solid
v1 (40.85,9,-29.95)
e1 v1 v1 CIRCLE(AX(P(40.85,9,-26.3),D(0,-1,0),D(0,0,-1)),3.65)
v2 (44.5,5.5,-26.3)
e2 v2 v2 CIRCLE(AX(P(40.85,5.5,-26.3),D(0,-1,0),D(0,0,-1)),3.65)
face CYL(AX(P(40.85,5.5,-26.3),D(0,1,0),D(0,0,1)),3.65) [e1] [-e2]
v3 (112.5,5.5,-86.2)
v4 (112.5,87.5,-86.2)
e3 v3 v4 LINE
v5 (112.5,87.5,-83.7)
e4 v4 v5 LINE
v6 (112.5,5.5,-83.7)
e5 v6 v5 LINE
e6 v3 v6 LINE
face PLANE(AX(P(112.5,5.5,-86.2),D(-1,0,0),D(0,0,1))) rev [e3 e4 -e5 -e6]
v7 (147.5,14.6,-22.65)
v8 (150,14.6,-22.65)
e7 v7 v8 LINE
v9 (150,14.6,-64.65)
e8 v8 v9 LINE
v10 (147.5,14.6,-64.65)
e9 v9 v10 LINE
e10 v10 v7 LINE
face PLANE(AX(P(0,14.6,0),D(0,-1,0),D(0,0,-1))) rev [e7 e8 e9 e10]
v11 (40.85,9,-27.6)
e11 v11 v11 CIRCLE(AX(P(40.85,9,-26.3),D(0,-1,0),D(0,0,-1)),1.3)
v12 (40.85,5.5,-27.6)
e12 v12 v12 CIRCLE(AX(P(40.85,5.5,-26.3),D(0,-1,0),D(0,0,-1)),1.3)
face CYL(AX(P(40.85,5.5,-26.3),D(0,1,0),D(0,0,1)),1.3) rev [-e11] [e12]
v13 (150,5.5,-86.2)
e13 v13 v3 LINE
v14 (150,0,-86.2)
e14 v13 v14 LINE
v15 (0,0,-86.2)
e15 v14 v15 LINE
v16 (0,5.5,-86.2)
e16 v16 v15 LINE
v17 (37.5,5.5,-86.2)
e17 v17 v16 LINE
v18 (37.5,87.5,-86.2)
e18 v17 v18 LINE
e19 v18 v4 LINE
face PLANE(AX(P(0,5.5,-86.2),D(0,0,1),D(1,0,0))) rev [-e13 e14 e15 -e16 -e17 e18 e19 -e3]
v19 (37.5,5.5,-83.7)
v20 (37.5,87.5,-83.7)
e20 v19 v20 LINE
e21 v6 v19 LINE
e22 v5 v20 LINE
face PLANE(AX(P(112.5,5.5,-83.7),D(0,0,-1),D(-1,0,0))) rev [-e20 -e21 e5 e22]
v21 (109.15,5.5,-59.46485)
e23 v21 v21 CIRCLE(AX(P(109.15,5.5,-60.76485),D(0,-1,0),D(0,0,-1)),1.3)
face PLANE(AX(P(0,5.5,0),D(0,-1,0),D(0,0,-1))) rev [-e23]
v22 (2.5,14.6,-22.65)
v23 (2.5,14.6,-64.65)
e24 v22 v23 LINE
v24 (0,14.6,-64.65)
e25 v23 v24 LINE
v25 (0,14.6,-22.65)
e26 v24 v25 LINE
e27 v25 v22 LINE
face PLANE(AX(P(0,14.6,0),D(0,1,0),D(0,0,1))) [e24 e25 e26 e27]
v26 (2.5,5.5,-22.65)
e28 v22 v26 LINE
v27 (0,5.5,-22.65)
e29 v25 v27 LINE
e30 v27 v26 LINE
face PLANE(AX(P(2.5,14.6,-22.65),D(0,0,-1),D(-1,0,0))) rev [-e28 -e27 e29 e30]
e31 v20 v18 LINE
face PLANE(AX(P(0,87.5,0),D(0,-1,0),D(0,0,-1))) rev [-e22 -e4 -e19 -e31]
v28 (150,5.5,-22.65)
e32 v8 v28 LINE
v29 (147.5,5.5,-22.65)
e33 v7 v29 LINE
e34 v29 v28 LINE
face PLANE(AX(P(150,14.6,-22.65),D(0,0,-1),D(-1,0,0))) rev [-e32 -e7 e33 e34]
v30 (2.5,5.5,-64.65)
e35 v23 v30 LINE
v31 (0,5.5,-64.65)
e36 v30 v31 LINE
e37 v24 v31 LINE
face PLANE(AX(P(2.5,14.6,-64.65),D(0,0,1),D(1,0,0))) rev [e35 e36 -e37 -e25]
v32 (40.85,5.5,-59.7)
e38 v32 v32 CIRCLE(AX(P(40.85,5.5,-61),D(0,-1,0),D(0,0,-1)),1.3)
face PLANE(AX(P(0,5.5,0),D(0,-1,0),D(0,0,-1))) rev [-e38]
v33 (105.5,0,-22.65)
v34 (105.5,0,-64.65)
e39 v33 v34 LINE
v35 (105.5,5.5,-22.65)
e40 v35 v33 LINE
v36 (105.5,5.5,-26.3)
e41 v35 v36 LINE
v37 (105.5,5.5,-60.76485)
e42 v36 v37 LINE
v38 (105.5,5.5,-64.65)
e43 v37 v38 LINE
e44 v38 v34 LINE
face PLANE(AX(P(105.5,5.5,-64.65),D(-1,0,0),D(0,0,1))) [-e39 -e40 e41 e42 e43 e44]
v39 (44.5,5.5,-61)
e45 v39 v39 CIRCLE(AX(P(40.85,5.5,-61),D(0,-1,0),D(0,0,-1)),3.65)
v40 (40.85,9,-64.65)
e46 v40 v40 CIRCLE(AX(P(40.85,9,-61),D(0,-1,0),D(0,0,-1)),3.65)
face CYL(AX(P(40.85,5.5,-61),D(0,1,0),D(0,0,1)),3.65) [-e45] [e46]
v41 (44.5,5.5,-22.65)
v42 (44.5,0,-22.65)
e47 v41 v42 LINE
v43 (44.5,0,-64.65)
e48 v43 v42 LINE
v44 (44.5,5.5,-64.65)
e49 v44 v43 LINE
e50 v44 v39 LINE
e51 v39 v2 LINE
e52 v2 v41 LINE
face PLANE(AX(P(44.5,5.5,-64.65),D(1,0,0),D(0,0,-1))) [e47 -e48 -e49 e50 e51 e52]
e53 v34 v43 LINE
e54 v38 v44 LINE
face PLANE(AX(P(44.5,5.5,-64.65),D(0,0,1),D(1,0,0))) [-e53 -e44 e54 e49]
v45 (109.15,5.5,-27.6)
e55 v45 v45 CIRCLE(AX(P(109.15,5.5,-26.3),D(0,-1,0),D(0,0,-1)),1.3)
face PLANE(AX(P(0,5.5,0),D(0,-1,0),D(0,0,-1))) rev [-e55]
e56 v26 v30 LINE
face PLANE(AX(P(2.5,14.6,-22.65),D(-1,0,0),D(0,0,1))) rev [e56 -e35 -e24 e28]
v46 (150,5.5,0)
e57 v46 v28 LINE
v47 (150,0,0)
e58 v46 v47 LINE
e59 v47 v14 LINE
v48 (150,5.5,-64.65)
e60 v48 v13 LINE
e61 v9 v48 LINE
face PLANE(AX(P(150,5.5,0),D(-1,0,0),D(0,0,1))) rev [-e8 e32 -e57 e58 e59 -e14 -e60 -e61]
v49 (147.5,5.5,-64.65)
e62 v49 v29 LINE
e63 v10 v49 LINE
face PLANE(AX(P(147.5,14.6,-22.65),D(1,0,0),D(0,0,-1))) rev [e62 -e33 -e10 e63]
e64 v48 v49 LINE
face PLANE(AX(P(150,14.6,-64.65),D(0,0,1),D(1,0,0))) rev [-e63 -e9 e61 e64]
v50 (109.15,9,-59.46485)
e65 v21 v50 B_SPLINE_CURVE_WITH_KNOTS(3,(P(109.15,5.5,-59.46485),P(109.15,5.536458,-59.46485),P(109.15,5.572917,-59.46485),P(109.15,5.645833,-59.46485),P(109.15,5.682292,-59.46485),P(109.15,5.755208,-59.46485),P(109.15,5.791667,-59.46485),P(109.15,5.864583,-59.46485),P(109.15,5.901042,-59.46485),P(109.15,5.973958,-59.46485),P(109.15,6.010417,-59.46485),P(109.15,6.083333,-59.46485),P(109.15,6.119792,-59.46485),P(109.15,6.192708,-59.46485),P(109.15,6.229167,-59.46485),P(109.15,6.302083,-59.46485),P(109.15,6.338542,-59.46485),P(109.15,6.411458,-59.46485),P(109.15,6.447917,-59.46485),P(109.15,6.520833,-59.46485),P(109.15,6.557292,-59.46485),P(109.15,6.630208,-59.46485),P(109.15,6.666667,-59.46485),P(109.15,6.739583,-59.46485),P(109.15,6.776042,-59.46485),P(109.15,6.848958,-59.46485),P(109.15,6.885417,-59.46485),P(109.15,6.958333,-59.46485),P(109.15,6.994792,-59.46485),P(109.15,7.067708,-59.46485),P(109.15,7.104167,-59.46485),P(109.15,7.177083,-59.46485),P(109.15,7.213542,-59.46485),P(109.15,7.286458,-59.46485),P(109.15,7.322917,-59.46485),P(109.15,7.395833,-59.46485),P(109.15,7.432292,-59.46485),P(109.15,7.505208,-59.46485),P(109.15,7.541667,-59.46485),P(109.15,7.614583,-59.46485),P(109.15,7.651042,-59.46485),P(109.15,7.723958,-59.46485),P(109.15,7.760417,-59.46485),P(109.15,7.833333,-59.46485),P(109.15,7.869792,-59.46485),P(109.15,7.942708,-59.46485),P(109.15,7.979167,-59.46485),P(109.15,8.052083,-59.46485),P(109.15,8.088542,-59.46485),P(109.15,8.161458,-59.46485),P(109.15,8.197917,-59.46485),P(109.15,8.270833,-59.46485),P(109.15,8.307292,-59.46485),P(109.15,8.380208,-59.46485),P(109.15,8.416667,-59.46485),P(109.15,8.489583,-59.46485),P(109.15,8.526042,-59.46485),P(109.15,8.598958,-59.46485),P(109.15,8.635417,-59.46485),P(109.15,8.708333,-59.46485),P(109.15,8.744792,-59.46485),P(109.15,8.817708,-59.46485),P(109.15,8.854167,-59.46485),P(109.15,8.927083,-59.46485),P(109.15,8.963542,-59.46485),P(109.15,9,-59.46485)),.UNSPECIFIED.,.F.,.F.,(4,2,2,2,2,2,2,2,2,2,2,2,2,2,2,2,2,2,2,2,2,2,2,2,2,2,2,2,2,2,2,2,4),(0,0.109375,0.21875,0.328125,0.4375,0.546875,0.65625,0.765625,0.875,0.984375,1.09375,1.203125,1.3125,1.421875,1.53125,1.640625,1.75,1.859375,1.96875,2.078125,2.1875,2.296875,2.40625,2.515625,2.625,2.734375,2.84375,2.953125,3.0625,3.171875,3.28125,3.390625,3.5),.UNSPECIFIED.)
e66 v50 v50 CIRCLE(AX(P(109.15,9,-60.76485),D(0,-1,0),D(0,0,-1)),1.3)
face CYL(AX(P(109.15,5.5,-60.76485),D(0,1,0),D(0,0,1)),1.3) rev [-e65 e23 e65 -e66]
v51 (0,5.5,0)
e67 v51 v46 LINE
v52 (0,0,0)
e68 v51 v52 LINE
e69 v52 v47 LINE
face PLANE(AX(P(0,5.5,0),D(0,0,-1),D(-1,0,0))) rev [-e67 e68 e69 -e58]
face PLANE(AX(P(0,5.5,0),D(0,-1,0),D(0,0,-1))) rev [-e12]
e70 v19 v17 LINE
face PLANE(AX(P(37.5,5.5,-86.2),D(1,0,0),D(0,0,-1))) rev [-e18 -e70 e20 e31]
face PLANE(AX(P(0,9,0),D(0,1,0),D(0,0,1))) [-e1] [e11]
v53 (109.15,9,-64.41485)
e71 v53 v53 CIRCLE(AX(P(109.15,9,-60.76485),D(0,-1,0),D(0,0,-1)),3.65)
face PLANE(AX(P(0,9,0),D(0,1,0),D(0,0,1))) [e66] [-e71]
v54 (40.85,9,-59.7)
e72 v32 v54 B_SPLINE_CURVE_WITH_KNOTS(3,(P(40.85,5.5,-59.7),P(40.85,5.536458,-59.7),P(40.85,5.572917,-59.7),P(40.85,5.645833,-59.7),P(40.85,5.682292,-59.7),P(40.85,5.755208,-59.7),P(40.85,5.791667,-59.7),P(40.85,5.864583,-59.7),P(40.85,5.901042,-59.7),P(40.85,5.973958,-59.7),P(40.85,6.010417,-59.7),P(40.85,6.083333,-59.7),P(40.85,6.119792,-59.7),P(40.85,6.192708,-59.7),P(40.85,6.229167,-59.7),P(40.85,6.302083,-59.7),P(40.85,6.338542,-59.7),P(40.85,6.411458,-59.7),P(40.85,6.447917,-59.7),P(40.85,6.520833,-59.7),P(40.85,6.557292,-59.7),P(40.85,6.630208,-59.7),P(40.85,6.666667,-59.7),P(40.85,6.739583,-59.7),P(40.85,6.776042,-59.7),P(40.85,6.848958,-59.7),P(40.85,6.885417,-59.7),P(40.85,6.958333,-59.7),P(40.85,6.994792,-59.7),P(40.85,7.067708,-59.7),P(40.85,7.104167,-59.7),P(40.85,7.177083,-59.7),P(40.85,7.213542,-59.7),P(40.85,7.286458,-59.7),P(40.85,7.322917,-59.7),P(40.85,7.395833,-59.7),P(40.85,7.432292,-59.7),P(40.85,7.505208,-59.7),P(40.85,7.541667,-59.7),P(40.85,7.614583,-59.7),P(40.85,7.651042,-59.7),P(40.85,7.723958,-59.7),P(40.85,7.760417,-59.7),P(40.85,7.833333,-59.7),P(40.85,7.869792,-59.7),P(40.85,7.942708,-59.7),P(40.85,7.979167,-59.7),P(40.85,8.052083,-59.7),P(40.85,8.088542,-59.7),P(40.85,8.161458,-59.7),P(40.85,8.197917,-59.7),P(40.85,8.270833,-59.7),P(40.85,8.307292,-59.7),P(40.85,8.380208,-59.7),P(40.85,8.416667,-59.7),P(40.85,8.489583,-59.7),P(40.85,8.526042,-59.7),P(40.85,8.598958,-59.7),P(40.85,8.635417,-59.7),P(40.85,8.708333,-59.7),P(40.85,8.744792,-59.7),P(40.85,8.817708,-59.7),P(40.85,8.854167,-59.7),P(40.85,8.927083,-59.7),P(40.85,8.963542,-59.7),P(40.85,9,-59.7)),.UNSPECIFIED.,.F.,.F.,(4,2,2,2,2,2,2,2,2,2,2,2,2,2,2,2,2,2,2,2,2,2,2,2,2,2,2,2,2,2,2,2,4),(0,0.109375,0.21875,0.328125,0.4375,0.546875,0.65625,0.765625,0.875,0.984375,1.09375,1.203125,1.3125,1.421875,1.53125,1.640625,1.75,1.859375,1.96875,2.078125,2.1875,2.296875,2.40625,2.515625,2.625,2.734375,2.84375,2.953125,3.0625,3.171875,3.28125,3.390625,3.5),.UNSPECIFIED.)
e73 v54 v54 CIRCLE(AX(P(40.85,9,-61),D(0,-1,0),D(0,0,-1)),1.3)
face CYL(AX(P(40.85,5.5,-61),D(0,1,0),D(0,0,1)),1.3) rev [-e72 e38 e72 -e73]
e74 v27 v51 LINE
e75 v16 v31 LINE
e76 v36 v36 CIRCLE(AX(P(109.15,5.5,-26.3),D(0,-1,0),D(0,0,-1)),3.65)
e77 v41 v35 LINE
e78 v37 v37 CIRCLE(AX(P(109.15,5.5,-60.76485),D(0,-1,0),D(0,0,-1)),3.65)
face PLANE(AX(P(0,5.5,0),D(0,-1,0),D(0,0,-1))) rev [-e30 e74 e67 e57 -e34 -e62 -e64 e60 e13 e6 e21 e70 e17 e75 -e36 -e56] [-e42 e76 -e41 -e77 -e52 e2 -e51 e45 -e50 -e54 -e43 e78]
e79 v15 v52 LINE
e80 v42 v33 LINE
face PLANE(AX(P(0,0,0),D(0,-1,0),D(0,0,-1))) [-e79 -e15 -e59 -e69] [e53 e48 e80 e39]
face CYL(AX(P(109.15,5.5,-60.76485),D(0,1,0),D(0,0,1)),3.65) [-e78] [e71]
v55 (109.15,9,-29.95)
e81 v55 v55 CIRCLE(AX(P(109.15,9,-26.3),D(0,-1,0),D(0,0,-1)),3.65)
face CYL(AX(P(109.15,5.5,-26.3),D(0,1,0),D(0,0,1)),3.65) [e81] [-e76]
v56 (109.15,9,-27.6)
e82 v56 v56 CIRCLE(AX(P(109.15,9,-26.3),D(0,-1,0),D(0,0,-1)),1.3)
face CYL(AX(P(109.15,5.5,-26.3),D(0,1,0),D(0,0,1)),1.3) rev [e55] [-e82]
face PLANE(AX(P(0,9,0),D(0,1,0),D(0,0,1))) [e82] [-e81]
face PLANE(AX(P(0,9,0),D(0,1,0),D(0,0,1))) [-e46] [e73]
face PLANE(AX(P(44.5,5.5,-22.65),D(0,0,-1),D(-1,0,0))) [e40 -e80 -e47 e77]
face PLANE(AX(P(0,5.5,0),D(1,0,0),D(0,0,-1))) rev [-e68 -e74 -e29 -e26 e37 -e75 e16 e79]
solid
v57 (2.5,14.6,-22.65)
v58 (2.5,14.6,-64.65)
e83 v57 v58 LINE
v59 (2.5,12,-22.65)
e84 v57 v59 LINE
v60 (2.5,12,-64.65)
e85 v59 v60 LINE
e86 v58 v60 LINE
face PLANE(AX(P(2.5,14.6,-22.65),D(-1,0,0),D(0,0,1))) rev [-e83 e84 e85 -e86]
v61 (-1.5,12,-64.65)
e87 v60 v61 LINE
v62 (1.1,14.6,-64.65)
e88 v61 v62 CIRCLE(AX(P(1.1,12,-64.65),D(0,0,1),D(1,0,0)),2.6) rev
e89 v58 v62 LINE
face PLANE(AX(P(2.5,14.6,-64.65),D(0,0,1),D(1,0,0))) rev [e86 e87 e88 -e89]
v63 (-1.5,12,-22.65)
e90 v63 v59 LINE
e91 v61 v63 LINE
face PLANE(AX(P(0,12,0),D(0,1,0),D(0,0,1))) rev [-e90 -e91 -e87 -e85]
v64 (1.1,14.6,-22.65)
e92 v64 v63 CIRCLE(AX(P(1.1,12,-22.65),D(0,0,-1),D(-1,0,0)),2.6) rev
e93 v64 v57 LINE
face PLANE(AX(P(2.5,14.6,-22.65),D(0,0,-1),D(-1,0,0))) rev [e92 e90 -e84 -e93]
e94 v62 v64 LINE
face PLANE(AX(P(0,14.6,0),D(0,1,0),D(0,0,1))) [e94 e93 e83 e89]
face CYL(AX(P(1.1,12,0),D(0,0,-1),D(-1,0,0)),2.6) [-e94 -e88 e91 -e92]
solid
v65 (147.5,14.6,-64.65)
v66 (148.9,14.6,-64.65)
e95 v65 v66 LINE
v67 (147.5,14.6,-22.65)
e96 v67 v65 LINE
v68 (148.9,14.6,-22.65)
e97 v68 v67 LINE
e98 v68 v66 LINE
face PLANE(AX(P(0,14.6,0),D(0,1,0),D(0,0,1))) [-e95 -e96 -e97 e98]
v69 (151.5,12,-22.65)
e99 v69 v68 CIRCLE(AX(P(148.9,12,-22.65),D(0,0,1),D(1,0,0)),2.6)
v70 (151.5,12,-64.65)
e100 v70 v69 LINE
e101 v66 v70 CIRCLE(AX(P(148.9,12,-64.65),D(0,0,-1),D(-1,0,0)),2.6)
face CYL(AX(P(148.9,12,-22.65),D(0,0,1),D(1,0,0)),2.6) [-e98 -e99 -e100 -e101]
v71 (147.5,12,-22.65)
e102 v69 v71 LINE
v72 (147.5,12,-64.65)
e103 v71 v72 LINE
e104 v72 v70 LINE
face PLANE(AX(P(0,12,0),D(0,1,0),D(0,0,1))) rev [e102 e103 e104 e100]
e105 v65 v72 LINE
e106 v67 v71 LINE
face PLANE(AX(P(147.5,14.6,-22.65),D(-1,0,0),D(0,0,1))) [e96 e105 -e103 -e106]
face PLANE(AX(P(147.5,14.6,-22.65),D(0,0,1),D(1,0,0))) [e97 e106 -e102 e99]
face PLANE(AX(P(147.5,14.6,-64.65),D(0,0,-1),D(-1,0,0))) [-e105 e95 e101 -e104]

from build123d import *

# Parameters (mm, degrees)
ESBO_O1_W                  = 150
ESBO_O1_H                  = 86.2
ESBO_O1_W_2                = 61
ESBO_O1_H_2                = 42
RESSALTO_EXTRUS_O1_DEPTH   = 5.5
ESBO_O2_W                  = 2.5
ESBO_O2_H                  = 42
RESSALTO_EXTRUS_O2_DEPTH   = 14.6
RESSALTO_EXTRUS_O3_DEPTH   = 2.6
RESSALTO_EXTRUS_O3_2_DEPTH = 2.6
FILETE3_R                  = 2.6
FILETE4_R                  = 2.6
F_3DSKETCH3_R              = 3.65
F_3DSKETCH3_R_2            = 1.3
RESSALTO_EXTRUS_O4_DEPTH   = 3.5
RESSALTO_EXTRUS_O5_DEPTH   = 82


with BuildPart() as part:
    # Esboço1 → Ressalto-extrusão1 (new body)
    with BuildSketch(Plane(origin=(0, 0, 0), x_dir=(1, 0, 0), z_dir=(0, 1, 0))):
        with Locations((75, 43.1)):
            Rectangle(ESBO_O1_W, ESBO_O1_H)
        with Locations((75, 43.65)):
            Rectangle(ESBO_O1_W_2, ESBO_O1_H_2, mode=Mode.SUBTRACT)
    extrude(amount=RESSALTO_EXTRUS_O1_DEPTH)

    # Esboço2 → Ressalto-extrusão2 (add)
    with BuildSketch(Plane(origin=(0, 0, 0), x_dir=(1, 0, 0), z_dir=(0, 1, 0))):
        with Locations((1.25, 43.65)):
            Rectangle(ESBO_O2_W, ESBO_O2_H)
        with Locations((148.75, 43.65)):
            Rectangle(ESBO_O2_W, ESBO_O2_H)
    extrude(amount=RESSALTO_EXTRUS_O2_DEPTH)

    # 3DSketch3 → Ressalto-extrusão4 (add)
    # profile 1 of 4: a face of its own
    with BuildSketch(Plane(origin=(109.15, 5.5, -26.3), x_dir=(-0.8915370353260333, 0, -0.45294780564880466), z_dir=(0, 1, 0))):
        with Locations(Location((0, 0, 0), (0, 0, 26.932969981))):
            Circle(F_3DSKETCH3_R)
        with Locations(Location((0, 0, 0), (0, 0, 296.932969981))):
            Circle(F_3DSKETCH3_R_2, mode=Mode.SUBTRACT)
    # profile 2 of 4: a face of its own
    with BuildSketch(Plane(origin=(109.15, 5.5, -26.3), x_dir=(-0.8915370353260333, 0, -0.45294780564880466), z_dir=(0, 1, 0))):
        with Locations(Location((15.610778124, -30.726690082, 0), (0, 0, 26.932969981))):
            Circle(F_3DSKETCH3_R)
        with Locations(Location((15.610778124, -30.726690082, 0), (0, 0, 116.932969981))):
            Circle(F_3DSKETCH3_R_2, mode=Mode.SUBTRACT)
    # profile 3 of 4: a face of its own
    with BuildSketch(Plane(origin=(109.15, 5.5, -26.3), x_dir=(-0.8915370353260333, 0, -0.45294780564880466), z_dir=(0, 1, 0))):
        with Locations(Location((60.891979513, 30.936335126, 0), (0, 0, 206.932969981))):
            Circle(F_3DSKETCH3_R)
        with Locations(Location((60.891979513, 30.936335126, 0), (0, 0, 296.932969981))):
            Circle(F_3DSKETCH3_R_2, mode=Mode.SUBTRACT)
    # profile 4 of 4: a face of its own
    with BuildSketch(Plane(origin=(109.15, 5.5, -26.3), x_dir=(-0.8915370353260333, 0, -0.45294780564880466), z_dir=(0, 1, 0))):
        with Locations(Location((76.609268369, 0, 0), (0, 0, 206.932969981))):
            Circle(F_3DSKETCH3_R)
        with Locations(Location((76.609268369, 0, 0), (0, 0, 116.932969981))):
            Circle(F_3DSKETCH3_R_2, mode=Mode.SUBTRACT)
    extrude(amount=RESSALTO_EXTRUS_O4_DEPTH)

    # 3DSketch4 → Ressalto-extrusão5 (add)
    with BuildSketch(Plane(origin=(112.5, 5.5, -86.2), x_dir=(-0.9994449069791543, 0, 0.03331483023263851), z_dir=(0, -1, 0))):
        Polygon((0, 0), (74.958368023, 2.498612267), (75.041655099, 0), (0.083287076, -2.498612267), align=None)
    extrude(amount=-RESSALTO_EXTRUS_O5_DEPTH)


with BuildPart() as body_2:
    # 3DSketch2 → Ressalto-extrusão3 (new body)
    with BuildSketch(Plane(origin=(147.5, 14.6, -22.65), x_dir=(-0.962492938133368, 0, -0.27130673423893603), z_dir=(0, -1, 0))):
        Polygon((0, 0), (-3.849971753, 1.085226937), (7.544911086, 41.509930339), (11.394882838, 40.424703402), align=None)
    extrude(amount=RESSALTO_EXTRUS_O3_DEPTH)

    # Filete4
    filete4_edges = [body_2.edges().sort_by_distance(p)[0] for p in [
        (151.5, 14.6, -43.65),
    ]]
    fillet(filete4_edges, radius=FILETE4_R - 0.0001)  # a hair under: the kernel refuses the full size


with BuildPart() as body_3:
    # 3DSketch2 → Ressalto-extrus_o3 2 (new body)
    with BuildSketch(Plane(origin=(147.5, 14.6, -22.65), x_dir=(-0.962492938133368, 0, -0.27130673423893603), z_dir=(0, -1, 0))):
        Polygon((139.561476029, -39.339476465), (143.411447782, -40.424703402), (154.80633062, 0), (150.956358867, 1.085226937), align=None)
    extrude(amount=RESSALTO_EXTRUS_O3_2_DEPTH)

    # Filete3
    filete3_edges = [body_3.edges().sort_by_distance(p)[0] for p in [
        (-1.5, 14.6, -43.65),
    ]]
    fillet(filete3_edges, radius=FILETE3_R - 0.0001)  # a hair under: the kernel refuses the full size


solid = Compound([part.part, body_2.part, body_3.part])
